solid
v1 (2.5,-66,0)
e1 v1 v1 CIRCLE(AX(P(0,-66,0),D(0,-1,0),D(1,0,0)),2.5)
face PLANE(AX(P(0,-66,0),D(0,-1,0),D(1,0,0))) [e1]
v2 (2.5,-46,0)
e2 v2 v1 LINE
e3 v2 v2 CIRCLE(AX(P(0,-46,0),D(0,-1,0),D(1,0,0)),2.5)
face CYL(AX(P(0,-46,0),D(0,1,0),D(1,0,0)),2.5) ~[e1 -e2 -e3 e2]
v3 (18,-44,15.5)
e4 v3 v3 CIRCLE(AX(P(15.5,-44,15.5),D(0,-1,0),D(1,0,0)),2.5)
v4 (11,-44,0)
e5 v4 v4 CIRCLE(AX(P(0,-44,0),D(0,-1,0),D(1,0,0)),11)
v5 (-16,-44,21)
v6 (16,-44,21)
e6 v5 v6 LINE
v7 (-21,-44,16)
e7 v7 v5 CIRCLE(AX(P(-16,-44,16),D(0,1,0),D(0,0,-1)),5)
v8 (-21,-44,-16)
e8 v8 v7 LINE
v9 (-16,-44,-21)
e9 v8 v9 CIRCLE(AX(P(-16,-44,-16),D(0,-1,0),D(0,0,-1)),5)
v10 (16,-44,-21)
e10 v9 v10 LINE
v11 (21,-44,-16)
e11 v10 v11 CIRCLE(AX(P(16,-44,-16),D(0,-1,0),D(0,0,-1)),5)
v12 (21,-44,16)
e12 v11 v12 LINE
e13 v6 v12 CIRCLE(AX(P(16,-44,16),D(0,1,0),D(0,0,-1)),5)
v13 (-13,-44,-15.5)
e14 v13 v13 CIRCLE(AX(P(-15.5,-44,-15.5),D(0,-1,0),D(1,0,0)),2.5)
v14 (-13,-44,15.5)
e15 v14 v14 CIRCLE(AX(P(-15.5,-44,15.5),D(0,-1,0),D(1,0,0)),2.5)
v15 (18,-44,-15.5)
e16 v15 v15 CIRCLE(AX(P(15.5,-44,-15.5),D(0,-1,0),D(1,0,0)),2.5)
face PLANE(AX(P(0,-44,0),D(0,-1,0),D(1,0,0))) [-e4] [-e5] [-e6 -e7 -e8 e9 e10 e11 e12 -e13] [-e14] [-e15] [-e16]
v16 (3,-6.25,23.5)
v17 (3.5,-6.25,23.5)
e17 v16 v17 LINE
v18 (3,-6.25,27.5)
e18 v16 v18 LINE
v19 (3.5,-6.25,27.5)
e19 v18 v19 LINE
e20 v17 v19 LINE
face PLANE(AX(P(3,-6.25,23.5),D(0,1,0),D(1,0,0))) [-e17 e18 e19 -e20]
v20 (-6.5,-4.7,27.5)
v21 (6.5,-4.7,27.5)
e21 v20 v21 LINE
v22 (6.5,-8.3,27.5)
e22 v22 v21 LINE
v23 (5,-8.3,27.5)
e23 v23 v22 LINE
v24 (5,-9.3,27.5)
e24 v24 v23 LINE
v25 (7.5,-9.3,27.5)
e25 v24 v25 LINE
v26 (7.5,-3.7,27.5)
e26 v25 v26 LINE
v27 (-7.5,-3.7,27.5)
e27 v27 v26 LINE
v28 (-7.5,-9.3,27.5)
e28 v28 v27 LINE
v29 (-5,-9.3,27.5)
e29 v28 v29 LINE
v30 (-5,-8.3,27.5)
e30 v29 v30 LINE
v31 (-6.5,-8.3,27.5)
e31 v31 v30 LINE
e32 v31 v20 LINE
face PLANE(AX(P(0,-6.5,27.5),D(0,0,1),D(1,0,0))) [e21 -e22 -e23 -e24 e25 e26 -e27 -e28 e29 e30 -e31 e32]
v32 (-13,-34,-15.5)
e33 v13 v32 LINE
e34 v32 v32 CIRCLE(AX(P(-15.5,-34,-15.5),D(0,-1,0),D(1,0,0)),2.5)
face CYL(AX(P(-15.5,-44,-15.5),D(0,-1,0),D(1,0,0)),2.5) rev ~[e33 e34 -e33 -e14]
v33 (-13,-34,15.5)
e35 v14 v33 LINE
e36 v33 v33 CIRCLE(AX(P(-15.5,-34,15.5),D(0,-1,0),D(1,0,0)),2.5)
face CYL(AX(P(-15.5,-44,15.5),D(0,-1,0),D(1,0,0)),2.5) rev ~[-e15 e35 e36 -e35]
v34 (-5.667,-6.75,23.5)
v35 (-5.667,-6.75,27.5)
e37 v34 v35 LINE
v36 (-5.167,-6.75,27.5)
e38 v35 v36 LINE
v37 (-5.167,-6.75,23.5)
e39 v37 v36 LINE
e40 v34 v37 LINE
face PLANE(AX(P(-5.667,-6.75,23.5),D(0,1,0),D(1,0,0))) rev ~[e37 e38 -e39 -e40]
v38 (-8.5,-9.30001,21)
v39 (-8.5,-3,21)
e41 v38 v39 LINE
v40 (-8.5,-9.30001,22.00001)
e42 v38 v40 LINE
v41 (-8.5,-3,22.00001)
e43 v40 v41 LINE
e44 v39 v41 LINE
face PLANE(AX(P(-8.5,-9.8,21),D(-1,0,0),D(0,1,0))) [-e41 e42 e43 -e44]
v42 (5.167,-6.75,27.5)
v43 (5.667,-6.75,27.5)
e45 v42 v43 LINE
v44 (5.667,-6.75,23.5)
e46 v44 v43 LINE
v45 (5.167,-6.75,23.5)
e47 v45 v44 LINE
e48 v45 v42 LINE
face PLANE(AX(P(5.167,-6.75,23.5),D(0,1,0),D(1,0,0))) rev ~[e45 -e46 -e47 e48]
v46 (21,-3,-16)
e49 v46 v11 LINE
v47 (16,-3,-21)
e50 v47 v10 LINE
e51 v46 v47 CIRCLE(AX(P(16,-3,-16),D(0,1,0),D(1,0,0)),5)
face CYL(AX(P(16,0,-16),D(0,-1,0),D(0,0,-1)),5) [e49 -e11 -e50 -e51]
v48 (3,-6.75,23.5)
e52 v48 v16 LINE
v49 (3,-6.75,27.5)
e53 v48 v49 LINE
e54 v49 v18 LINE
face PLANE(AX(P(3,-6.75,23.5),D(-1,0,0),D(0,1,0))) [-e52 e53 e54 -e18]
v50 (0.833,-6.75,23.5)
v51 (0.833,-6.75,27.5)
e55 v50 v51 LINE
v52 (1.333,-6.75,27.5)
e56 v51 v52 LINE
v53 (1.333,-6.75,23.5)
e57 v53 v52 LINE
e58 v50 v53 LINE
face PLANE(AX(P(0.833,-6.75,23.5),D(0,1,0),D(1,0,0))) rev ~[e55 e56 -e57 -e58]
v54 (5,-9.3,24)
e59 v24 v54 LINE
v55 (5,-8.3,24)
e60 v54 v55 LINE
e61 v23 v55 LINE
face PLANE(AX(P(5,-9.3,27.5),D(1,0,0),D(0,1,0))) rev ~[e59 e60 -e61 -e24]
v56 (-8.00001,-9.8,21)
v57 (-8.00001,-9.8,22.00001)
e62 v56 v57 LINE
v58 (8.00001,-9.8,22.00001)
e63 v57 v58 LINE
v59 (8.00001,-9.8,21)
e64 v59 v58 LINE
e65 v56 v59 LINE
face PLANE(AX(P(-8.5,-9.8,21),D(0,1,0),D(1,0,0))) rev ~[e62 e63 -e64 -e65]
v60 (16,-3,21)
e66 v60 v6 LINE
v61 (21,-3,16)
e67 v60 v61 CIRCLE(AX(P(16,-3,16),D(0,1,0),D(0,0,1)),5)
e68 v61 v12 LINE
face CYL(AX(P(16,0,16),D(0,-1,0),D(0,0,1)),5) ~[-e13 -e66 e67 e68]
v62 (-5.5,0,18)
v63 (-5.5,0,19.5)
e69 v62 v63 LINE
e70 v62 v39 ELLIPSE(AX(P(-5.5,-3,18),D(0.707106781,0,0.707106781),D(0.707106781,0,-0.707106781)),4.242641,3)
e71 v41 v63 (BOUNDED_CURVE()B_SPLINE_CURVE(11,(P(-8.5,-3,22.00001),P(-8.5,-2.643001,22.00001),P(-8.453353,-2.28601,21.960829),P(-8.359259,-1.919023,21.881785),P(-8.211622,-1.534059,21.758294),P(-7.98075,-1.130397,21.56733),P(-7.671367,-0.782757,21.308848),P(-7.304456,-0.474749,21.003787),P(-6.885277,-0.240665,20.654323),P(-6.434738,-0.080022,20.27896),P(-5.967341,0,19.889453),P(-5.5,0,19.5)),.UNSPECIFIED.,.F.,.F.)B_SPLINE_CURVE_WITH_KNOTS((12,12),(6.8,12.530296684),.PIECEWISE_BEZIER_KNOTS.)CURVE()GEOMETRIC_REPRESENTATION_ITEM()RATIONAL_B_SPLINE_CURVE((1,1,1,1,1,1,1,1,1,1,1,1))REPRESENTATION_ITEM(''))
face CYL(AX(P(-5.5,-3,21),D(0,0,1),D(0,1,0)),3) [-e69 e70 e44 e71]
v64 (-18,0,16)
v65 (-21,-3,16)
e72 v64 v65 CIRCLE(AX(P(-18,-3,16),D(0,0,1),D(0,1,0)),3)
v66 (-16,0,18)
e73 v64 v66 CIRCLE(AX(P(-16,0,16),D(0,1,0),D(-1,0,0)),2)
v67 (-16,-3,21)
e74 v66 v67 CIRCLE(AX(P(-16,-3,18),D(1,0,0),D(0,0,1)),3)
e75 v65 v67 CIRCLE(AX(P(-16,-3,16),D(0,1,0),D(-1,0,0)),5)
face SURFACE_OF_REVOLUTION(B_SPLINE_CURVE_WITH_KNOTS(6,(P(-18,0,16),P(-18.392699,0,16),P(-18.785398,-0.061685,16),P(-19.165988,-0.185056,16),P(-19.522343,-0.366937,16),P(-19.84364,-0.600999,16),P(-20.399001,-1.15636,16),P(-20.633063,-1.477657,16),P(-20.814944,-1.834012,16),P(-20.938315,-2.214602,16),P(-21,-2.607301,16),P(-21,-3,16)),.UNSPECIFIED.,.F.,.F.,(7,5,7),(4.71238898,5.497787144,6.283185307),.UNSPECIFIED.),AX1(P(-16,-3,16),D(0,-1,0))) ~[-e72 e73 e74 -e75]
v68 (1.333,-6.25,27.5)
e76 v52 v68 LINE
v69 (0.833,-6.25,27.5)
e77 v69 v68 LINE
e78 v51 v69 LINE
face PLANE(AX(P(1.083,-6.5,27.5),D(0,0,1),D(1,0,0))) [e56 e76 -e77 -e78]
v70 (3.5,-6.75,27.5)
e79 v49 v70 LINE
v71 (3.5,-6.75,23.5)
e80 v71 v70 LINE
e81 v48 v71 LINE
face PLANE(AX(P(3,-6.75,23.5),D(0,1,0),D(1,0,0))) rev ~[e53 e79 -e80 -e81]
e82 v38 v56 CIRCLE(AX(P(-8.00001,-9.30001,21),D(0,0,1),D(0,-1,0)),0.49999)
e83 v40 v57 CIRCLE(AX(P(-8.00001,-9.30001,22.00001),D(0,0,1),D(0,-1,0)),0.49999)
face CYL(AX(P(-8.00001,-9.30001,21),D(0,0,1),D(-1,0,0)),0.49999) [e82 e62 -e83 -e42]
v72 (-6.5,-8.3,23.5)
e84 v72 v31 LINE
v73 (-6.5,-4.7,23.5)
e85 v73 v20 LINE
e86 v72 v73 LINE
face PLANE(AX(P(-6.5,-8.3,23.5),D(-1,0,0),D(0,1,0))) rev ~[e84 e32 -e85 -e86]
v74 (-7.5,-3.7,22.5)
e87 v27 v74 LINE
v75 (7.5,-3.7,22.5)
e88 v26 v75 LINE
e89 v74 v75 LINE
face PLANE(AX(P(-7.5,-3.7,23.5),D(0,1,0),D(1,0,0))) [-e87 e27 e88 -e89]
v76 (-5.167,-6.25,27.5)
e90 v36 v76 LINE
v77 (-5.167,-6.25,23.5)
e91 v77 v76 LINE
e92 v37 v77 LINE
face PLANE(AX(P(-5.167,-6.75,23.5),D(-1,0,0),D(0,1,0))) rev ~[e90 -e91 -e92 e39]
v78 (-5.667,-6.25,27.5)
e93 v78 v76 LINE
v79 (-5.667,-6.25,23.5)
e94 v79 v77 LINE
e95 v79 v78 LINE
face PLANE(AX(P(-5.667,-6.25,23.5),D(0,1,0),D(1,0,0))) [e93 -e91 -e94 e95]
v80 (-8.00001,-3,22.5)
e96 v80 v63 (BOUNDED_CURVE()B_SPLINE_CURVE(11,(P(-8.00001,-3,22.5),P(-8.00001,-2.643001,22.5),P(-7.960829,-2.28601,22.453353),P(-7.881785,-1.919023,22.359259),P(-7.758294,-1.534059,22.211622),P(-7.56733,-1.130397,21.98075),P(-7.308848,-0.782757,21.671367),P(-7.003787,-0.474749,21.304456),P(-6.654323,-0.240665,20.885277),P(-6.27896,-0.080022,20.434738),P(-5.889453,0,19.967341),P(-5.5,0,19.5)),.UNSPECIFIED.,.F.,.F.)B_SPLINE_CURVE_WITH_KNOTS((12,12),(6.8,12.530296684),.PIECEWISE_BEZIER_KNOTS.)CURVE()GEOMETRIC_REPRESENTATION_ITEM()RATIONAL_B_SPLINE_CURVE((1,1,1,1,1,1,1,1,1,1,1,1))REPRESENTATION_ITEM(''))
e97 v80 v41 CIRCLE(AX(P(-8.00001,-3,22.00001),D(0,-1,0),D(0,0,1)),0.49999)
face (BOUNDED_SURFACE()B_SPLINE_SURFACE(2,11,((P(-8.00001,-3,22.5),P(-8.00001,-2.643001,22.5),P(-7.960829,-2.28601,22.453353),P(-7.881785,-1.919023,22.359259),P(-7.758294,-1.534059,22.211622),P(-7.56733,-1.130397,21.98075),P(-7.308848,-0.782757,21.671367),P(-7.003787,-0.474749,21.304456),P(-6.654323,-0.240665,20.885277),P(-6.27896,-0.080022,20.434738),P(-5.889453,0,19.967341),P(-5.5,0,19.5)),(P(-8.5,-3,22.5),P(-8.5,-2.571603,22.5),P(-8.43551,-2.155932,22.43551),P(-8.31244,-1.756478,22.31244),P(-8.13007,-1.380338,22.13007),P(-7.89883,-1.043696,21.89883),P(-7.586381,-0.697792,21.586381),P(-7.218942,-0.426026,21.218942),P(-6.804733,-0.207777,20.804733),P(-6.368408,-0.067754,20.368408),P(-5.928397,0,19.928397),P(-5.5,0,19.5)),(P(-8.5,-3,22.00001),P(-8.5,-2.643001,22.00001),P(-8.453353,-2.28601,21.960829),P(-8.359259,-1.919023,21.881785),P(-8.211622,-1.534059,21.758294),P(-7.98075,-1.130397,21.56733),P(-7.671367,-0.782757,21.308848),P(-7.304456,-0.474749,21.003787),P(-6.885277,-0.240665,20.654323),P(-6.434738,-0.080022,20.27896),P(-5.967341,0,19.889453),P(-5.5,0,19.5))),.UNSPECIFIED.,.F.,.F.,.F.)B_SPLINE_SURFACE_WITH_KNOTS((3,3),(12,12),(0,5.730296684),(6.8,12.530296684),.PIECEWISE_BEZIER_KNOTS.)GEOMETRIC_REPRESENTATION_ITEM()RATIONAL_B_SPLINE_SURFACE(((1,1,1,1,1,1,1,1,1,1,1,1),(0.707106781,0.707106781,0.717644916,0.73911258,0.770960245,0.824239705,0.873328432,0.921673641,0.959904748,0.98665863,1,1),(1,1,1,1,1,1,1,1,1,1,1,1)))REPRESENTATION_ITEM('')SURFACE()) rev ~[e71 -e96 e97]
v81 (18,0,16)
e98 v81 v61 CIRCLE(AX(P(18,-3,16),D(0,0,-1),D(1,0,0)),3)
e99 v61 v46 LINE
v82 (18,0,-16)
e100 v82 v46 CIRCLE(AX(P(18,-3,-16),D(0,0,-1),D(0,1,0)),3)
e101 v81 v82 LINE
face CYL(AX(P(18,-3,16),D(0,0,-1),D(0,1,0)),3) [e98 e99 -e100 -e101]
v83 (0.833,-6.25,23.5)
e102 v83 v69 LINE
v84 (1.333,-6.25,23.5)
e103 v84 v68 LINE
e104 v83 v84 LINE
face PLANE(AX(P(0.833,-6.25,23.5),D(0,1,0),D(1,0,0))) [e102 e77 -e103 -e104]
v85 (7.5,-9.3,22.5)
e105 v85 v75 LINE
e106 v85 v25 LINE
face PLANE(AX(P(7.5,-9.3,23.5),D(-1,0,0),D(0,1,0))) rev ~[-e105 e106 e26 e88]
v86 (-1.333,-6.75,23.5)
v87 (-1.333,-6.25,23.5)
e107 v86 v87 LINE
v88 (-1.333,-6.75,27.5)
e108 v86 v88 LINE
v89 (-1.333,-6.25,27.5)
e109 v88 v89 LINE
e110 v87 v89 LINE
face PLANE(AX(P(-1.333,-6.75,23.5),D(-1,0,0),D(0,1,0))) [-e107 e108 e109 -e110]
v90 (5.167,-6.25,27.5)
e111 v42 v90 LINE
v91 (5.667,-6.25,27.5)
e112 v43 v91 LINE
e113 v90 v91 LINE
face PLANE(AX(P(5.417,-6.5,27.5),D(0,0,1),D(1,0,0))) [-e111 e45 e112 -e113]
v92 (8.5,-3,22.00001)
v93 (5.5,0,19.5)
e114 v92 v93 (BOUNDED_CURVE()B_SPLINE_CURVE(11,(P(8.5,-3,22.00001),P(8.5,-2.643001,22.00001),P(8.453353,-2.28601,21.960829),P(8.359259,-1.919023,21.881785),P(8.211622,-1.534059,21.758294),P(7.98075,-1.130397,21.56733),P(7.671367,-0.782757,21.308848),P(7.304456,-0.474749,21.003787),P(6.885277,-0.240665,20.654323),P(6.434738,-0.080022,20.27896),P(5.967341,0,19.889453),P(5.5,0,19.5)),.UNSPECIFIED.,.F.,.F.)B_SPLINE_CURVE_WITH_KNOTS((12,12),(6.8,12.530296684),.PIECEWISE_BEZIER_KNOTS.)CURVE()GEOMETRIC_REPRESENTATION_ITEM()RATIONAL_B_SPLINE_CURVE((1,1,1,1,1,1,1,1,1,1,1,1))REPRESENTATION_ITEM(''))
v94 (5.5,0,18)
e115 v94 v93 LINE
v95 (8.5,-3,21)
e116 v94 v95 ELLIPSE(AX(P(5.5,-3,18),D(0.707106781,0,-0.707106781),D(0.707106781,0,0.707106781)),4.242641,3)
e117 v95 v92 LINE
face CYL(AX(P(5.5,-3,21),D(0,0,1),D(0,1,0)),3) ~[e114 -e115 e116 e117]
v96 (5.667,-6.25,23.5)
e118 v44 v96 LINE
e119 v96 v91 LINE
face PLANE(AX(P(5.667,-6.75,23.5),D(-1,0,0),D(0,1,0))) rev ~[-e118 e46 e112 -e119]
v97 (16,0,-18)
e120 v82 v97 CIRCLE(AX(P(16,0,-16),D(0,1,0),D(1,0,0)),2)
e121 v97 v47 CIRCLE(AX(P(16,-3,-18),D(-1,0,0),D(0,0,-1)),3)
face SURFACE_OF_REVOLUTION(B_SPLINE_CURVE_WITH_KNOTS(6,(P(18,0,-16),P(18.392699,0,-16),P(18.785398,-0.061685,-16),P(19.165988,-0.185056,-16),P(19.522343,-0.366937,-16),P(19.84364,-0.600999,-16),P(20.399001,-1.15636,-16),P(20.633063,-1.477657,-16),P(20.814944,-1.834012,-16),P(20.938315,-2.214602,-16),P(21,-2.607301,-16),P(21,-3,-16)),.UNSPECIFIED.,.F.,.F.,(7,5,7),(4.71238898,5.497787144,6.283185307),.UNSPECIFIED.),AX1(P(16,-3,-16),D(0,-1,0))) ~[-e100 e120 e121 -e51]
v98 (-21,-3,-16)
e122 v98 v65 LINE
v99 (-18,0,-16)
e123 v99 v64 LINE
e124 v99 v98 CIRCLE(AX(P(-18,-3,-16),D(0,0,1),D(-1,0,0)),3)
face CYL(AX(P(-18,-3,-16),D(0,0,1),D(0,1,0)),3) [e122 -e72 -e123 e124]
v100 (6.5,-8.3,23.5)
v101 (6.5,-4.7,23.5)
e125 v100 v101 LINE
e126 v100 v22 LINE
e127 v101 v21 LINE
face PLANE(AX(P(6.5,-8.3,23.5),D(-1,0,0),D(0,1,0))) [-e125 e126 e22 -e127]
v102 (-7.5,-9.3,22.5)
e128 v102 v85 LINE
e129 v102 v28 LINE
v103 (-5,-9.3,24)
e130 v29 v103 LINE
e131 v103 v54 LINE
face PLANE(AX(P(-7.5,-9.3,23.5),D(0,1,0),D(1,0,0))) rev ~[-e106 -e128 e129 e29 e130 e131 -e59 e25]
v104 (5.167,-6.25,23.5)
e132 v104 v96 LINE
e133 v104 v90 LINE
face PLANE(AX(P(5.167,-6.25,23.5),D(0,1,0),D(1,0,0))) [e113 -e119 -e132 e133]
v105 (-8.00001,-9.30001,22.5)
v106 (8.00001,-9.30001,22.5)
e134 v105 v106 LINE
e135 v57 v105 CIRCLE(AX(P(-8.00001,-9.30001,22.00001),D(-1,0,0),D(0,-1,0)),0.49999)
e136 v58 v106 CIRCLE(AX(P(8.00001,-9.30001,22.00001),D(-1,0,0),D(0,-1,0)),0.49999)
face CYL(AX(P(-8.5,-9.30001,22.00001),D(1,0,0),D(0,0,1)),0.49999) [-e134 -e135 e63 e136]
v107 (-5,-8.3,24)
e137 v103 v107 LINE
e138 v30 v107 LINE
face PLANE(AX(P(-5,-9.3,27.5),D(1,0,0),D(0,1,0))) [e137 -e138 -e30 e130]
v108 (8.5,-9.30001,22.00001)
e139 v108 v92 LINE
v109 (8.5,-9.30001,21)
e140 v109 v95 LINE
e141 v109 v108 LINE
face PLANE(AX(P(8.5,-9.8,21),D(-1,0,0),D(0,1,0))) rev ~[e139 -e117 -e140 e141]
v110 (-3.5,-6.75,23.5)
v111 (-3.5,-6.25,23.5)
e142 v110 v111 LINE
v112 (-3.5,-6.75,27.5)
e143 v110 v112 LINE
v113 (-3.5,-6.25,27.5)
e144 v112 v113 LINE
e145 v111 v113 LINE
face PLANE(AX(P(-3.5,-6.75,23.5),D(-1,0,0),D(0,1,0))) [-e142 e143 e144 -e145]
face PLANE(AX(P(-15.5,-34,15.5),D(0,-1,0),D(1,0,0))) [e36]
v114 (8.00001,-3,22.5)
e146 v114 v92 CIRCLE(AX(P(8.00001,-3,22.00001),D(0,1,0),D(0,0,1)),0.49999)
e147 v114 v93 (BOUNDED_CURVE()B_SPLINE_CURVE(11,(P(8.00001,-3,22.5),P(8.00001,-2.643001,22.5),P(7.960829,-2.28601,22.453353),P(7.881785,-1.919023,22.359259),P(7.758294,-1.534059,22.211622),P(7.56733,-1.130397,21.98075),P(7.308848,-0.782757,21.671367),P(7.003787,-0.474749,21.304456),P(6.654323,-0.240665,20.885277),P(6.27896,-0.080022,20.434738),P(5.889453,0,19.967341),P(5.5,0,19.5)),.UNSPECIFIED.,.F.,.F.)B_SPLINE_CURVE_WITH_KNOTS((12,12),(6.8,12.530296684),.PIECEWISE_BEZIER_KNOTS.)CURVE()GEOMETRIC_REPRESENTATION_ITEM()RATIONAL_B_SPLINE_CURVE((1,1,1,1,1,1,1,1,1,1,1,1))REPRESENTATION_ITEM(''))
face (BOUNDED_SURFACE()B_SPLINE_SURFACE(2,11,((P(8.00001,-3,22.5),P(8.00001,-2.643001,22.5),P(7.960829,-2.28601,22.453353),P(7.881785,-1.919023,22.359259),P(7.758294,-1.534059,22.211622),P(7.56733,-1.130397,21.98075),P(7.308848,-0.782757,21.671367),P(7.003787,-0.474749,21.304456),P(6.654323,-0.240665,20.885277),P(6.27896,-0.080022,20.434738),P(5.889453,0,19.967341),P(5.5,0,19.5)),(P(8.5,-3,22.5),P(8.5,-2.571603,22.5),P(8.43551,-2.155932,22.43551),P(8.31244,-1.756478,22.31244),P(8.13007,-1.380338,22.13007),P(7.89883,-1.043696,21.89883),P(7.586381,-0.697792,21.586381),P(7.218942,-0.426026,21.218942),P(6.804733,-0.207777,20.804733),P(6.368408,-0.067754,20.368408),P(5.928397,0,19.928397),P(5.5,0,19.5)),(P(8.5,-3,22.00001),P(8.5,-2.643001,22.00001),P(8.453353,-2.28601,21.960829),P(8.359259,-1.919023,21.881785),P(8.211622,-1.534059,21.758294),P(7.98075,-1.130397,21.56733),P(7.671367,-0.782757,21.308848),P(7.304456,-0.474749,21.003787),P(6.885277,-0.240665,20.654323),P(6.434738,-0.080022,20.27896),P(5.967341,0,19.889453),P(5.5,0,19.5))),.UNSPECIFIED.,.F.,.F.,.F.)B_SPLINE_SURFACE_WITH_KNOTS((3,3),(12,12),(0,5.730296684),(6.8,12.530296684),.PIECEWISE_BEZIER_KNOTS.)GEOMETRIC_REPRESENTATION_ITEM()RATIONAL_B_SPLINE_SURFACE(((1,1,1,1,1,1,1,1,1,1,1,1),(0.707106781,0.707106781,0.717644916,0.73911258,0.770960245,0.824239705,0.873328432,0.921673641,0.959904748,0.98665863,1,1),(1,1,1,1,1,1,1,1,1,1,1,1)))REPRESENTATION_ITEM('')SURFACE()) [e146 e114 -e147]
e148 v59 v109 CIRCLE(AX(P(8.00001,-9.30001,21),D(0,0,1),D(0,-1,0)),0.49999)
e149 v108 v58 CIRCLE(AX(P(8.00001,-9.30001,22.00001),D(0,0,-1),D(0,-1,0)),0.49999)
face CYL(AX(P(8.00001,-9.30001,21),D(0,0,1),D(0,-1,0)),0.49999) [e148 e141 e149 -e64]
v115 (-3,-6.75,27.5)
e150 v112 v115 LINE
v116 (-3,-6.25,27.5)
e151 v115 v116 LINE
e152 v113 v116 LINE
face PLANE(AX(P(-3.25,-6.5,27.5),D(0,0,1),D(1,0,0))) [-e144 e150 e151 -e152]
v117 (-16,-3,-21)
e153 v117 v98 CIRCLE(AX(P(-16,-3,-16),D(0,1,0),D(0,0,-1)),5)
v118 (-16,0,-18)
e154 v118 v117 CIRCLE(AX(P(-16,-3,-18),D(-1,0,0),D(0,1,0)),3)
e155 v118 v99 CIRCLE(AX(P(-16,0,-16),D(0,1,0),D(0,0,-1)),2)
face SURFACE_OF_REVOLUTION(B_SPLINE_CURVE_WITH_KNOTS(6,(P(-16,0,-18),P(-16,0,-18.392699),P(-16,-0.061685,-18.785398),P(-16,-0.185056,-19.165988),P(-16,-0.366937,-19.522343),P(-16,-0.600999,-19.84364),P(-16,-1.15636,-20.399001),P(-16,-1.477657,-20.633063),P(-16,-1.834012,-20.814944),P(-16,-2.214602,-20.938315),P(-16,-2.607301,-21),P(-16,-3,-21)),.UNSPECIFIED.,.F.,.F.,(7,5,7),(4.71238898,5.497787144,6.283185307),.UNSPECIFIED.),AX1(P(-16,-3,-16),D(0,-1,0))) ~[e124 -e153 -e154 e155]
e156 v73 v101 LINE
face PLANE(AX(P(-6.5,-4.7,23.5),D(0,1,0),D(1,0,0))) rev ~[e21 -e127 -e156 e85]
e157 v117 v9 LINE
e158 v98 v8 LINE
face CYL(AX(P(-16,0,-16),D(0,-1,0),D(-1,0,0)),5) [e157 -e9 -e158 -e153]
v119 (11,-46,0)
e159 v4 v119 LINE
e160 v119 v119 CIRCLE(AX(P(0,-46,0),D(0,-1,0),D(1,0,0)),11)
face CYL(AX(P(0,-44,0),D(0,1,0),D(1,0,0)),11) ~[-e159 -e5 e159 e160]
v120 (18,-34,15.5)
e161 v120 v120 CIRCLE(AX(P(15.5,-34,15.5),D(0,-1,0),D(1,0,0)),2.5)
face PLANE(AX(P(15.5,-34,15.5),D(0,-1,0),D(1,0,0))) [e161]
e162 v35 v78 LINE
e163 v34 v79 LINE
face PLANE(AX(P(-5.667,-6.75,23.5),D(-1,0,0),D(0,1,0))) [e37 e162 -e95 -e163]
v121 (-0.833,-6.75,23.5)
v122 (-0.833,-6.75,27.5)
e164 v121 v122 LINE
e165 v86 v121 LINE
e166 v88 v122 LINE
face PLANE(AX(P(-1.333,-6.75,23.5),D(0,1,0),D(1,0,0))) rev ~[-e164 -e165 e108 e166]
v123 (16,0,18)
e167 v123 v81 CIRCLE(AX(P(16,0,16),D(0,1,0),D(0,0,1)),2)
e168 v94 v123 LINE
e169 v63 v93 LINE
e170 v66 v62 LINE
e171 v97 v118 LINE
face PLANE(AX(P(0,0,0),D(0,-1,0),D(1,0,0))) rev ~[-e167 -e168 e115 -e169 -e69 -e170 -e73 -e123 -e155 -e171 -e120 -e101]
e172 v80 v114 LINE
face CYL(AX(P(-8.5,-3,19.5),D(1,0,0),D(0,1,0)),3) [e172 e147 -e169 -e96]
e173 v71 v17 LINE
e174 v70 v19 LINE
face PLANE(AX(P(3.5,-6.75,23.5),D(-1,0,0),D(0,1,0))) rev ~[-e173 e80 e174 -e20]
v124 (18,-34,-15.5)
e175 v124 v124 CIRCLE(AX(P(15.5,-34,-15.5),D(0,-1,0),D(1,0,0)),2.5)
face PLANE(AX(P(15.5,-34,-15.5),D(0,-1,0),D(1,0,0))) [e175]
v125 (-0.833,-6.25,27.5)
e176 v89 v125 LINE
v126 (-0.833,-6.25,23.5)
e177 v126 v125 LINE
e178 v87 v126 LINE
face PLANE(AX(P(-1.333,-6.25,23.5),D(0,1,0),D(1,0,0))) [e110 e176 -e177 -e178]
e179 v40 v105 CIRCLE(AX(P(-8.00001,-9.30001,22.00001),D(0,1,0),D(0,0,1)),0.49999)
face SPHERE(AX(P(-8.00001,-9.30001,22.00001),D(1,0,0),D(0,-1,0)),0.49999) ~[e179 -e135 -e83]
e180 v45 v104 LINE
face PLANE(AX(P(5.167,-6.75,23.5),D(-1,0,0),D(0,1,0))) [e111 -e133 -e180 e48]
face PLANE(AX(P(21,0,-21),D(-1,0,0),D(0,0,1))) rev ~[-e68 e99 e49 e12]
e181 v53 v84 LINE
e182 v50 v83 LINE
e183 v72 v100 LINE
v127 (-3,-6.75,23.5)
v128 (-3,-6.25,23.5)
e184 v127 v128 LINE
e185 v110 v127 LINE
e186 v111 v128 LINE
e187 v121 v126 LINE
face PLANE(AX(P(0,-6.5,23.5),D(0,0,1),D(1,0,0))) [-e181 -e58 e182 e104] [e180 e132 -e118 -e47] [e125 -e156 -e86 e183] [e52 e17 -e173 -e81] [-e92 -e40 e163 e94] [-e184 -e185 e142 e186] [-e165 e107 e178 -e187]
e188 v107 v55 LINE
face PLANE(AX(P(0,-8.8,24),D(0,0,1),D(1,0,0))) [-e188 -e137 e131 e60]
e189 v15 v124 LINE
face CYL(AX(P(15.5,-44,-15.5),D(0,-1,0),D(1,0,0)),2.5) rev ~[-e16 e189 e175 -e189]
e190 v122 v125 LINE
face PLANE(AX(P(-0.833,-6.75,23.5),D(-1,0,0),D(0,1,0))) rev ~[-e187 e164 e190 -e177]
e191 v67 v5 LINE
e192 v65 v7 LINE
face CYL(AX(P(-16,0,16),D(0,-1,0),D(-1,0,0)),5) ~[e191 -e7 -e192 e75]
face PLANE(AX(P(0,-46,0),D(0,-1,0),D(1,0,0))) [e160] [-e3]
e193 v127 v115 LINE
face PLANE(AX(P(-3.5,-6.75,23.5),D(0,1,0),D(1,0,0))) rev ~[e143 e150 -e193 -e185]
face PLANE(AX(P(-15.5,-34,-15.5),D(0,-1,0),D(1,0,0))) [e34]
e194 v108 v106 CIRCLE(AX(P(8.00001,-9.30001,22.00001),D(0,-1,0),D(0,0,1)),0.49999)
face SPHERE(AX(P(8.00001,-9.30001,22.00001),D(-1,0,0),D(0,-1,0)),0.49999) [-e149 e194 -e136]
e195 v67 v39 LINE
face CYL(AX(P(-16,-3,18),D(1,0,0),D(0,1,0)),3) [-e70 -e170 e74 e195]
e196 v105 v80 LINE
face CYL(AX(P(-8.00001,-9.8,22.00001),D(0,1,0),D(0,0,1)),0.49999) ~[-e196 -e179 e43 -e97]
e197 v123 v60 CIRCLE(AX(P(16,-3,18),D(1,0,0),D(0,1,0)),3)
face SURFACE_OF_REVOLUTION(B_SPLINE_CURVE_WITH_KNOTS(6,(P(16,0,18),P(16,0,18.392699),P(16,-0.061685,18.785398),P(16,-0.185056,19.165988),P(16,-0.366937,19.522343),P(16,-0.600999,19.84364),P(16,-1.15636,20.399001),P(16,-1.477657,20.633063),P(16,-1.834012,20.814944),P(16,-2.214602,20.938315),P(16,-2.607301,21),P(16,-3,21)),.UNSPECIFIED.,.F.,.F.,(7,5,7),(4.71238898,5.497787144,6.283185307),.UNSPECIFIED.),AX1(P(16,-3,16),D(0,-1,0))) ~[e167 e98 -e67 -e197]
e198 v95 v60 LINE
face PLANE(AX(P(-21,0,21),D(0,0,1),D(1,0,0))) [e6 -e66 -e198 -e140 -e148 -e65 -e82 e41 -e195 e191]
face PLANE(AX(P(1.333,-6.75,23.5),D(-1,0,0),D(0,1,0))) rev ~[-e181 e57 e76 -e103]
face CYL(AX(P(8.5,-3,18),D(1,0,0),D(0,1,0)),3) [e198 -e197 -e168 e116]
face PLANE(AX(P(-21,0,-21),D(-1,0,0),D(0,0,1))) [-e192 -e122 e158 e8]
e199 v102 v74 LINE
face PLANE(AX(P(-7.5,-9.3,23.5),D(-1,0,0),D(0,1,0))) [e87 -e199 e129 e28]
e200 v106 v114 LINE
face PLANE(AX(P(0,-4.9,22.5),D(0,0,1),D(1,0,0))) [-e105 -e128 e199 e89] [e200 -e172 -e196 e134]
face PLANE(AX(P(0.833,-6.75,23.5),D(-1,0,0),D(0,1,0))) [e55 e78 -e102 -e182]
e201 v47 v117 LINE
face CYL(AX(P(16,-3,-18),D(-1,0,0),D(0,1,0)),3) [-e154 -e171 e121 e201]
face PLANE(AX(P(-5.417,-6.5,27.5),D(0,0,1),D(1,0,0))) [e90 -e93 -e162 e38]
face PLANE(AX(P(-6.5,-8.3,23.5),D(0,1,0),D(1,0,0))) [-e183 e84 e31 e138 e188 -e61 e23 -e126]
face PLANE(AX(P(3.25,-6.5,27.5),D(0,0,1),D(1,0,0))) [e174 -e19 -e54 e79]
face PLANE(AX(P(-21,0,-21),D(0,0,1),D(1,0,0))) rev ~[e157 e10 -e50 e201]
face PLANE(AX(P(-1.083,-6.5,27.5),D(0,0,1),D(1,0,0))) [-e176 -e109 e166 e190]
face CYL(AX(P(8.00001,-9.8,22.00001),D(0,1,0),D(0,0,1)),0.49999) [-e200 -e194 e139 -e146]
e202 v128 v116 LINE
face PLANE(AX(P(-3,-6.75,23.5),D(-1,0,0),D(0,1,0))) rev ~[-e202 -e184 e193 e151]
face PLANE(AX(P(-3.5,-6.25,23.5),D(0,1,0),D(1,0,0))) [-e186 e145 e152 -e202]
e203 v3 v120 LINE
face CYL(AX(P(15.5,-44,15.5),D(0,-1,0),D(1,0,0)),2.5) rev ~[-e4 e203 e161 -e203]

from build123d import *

# Parameters (mm, degrees)
F0_W      = 42
F0_H      = 42
F1_DEPTH  = 44
F2_R      = 11
F3_DEPTH  = 2
F4_R      = 2.5
F5_DEPTH  = 20
F6_R      = 2.5
F7_DEPTH  = 10
F8_W      = 17
F8_H      = 9.8
F9_DEPTH  = 1.5
F10_R     = 5
F11_R     = 3
F12_W     = 15
F12_H     = 5.6
F13_DEPTH = 1
F14_W     = 15
F14_H     = 5.6
F14_W_2   = 13
F14_H_2   = 3.6
F15_DEPTH = 4
F16_W     = 0.5
F16_H     = 0.5
F17_DEPTH = 4
F18_R     = 0.49999
F19_W     = 10
F19_H     = 1
F20_DEPTH = 3.5


# Not quite as in the source:
# - a fillet or chamfer is up to 0.001 mm smaller than in the source, because OpenCascade refuses the exact size


with BuildPart() as f1:
    # F0 (on Front) → F1 (new body)
    with BuildSketch(Plane.XZ):
        Rectangle(F0_W, F0_H)
    extrude(amount=F1_DEPTH)

    # F2 (on face) → F3 (join)
    with BuildSketch(Plane.XZ.offset(44)):
        Circle(F2_R)
    extrude(amount=F3_DEPTH)

    # F4 (on face) → F5 (join)
    with BuildSketch(Plane.XZ.offset(46)):
        Circle(F4_R)
    extrude(amount=F5_DEPTH)

    # F6 (on face) → F7 (cut)
    with BuildSketch(Plane.XZ.offset(44)):
        with Locations((-15.5, 15.5)):
            Circle(F6_R)
        with Locations((15.5, 15.5)):
            Circle(F6_R)
        with Locations((15.5, -15.5)):
            Circle(F6_R)
        with Locations((-15.5, -15.5)):
            Circle(F6_R)
    extrude(amount=-F7_DEPTH, mode=Mode.SUBTRACT)

    # F8 (on face) → F9 (join)
    with BuildSketch(Plane.XY.offset(21)):
        with Locations((0, -4.9)):
            Rectangle(F8_W, F8_H)
    extrude(amount=F9_DEPTH)

    # F10
    f10_edges = [f1.edges().sort_by_distance(p)[0] for p in [
        (-21, -22, 21),
        (21, -22, 21),
        (21, -22, -21),
        (-21, -22, -21),
    ]]
    fillet(f10_edges, radius=F10_R)

    # F11
    f11_edges = [f1.edges().sort_by_distance(p)[0] for p in [
        (12.25, 0, 21),
        (19.535534, 0, 19.535534),
        (8.5, 0, 21.75),
        (21, 0, 0),
        (0, 0, 22.5),
        (19.535534, 0, -19.535534),
        (-8.5, 0, 21.75),
        (0, 0, -21),
        (-12.25, 0, 21),
        (-19.535534, 0, -19.535534),
        (-19.535534, 0, 19.535534),
        (-21, 0, 0),
    ]]
    fillet(f11_edges, radius=F11_R)

    # F12 (on face) → F13 (join)
    with BuildSketch(Plane.XY.offset(22.5)):
        with Locations((0, -6.5)):
            Rectangle(F12_W, F12_H)
    extrude(amount=F13_DEPTH)

    # F14 (on face) → F15 (join)
    with BuildSketch(Plane.XY.offset(23.5)):
        with Locations((0, -6.5)):
            Rectangle(F14_W, F14_H)
        with Locations((0, -6.5)):
            Rectangle(F14_W_2, F14_H_2, mode=Mode.SUBTRACT)
    extrude(amount=F15_DEPTH)

    # F16 (on face) → F17 (join)
    with BuildSketch(Plane.XY.offset(23.5)):
        with Locations((-5.417, -6.5)):
            Rectangle(F16_W, F16_H)
        with Locations((-3.25, -6.5)):
            Rectangle(F16_W, F16_H)
        with Locations((-1.083, -6.5)):
            Rectangle(F16_W, F16_H)
        with Locations((3.25, -6.5)):
            Rectangle(F16_W, F16_H)
        with Locations((1.083, -6.5)):
            Rectangle(F16_W, F16_H)
        with Locations((5.417, -6.5)):
            Rectangle(F16_W, F16_H)
    extrude(amount=F17_DEPTH)

    # F18 (radius 0.5 in the source; OpenCascade refuses exactly that, so slightly less here)
    f18_edges = [f1.edges().sort_by_distance(p)[0] for p in [
        (0, -9.8, 22.5),
        (8.5, -9.8, 21.75),
        (8.5, -6.4, 22.5),
        (-8.5, -9.8, 21.75),
        (-8.5, -6.4, 22.5),
        (-7.438147, -0.710112, 21.438147),
        (7.438147, -0.710112, 21.438147),
        (0, 0, 19.5),
        (5.5, 0, 18.75),
        (-5.5, 0, 18.75),
    ]]
    fillet(f18_edges, radius=F18_R)

    # F19 (on face) → F20 (cut)
    with BuildSketch(Plane.XY.offset(27.5)):
        with Locations((0, -8.8)):
            Rectangle(F19_W, F19_H)
    extrude(amount=-F20_DEPTH, mode=Mode.SUBTRACT)


solid = f1.part
